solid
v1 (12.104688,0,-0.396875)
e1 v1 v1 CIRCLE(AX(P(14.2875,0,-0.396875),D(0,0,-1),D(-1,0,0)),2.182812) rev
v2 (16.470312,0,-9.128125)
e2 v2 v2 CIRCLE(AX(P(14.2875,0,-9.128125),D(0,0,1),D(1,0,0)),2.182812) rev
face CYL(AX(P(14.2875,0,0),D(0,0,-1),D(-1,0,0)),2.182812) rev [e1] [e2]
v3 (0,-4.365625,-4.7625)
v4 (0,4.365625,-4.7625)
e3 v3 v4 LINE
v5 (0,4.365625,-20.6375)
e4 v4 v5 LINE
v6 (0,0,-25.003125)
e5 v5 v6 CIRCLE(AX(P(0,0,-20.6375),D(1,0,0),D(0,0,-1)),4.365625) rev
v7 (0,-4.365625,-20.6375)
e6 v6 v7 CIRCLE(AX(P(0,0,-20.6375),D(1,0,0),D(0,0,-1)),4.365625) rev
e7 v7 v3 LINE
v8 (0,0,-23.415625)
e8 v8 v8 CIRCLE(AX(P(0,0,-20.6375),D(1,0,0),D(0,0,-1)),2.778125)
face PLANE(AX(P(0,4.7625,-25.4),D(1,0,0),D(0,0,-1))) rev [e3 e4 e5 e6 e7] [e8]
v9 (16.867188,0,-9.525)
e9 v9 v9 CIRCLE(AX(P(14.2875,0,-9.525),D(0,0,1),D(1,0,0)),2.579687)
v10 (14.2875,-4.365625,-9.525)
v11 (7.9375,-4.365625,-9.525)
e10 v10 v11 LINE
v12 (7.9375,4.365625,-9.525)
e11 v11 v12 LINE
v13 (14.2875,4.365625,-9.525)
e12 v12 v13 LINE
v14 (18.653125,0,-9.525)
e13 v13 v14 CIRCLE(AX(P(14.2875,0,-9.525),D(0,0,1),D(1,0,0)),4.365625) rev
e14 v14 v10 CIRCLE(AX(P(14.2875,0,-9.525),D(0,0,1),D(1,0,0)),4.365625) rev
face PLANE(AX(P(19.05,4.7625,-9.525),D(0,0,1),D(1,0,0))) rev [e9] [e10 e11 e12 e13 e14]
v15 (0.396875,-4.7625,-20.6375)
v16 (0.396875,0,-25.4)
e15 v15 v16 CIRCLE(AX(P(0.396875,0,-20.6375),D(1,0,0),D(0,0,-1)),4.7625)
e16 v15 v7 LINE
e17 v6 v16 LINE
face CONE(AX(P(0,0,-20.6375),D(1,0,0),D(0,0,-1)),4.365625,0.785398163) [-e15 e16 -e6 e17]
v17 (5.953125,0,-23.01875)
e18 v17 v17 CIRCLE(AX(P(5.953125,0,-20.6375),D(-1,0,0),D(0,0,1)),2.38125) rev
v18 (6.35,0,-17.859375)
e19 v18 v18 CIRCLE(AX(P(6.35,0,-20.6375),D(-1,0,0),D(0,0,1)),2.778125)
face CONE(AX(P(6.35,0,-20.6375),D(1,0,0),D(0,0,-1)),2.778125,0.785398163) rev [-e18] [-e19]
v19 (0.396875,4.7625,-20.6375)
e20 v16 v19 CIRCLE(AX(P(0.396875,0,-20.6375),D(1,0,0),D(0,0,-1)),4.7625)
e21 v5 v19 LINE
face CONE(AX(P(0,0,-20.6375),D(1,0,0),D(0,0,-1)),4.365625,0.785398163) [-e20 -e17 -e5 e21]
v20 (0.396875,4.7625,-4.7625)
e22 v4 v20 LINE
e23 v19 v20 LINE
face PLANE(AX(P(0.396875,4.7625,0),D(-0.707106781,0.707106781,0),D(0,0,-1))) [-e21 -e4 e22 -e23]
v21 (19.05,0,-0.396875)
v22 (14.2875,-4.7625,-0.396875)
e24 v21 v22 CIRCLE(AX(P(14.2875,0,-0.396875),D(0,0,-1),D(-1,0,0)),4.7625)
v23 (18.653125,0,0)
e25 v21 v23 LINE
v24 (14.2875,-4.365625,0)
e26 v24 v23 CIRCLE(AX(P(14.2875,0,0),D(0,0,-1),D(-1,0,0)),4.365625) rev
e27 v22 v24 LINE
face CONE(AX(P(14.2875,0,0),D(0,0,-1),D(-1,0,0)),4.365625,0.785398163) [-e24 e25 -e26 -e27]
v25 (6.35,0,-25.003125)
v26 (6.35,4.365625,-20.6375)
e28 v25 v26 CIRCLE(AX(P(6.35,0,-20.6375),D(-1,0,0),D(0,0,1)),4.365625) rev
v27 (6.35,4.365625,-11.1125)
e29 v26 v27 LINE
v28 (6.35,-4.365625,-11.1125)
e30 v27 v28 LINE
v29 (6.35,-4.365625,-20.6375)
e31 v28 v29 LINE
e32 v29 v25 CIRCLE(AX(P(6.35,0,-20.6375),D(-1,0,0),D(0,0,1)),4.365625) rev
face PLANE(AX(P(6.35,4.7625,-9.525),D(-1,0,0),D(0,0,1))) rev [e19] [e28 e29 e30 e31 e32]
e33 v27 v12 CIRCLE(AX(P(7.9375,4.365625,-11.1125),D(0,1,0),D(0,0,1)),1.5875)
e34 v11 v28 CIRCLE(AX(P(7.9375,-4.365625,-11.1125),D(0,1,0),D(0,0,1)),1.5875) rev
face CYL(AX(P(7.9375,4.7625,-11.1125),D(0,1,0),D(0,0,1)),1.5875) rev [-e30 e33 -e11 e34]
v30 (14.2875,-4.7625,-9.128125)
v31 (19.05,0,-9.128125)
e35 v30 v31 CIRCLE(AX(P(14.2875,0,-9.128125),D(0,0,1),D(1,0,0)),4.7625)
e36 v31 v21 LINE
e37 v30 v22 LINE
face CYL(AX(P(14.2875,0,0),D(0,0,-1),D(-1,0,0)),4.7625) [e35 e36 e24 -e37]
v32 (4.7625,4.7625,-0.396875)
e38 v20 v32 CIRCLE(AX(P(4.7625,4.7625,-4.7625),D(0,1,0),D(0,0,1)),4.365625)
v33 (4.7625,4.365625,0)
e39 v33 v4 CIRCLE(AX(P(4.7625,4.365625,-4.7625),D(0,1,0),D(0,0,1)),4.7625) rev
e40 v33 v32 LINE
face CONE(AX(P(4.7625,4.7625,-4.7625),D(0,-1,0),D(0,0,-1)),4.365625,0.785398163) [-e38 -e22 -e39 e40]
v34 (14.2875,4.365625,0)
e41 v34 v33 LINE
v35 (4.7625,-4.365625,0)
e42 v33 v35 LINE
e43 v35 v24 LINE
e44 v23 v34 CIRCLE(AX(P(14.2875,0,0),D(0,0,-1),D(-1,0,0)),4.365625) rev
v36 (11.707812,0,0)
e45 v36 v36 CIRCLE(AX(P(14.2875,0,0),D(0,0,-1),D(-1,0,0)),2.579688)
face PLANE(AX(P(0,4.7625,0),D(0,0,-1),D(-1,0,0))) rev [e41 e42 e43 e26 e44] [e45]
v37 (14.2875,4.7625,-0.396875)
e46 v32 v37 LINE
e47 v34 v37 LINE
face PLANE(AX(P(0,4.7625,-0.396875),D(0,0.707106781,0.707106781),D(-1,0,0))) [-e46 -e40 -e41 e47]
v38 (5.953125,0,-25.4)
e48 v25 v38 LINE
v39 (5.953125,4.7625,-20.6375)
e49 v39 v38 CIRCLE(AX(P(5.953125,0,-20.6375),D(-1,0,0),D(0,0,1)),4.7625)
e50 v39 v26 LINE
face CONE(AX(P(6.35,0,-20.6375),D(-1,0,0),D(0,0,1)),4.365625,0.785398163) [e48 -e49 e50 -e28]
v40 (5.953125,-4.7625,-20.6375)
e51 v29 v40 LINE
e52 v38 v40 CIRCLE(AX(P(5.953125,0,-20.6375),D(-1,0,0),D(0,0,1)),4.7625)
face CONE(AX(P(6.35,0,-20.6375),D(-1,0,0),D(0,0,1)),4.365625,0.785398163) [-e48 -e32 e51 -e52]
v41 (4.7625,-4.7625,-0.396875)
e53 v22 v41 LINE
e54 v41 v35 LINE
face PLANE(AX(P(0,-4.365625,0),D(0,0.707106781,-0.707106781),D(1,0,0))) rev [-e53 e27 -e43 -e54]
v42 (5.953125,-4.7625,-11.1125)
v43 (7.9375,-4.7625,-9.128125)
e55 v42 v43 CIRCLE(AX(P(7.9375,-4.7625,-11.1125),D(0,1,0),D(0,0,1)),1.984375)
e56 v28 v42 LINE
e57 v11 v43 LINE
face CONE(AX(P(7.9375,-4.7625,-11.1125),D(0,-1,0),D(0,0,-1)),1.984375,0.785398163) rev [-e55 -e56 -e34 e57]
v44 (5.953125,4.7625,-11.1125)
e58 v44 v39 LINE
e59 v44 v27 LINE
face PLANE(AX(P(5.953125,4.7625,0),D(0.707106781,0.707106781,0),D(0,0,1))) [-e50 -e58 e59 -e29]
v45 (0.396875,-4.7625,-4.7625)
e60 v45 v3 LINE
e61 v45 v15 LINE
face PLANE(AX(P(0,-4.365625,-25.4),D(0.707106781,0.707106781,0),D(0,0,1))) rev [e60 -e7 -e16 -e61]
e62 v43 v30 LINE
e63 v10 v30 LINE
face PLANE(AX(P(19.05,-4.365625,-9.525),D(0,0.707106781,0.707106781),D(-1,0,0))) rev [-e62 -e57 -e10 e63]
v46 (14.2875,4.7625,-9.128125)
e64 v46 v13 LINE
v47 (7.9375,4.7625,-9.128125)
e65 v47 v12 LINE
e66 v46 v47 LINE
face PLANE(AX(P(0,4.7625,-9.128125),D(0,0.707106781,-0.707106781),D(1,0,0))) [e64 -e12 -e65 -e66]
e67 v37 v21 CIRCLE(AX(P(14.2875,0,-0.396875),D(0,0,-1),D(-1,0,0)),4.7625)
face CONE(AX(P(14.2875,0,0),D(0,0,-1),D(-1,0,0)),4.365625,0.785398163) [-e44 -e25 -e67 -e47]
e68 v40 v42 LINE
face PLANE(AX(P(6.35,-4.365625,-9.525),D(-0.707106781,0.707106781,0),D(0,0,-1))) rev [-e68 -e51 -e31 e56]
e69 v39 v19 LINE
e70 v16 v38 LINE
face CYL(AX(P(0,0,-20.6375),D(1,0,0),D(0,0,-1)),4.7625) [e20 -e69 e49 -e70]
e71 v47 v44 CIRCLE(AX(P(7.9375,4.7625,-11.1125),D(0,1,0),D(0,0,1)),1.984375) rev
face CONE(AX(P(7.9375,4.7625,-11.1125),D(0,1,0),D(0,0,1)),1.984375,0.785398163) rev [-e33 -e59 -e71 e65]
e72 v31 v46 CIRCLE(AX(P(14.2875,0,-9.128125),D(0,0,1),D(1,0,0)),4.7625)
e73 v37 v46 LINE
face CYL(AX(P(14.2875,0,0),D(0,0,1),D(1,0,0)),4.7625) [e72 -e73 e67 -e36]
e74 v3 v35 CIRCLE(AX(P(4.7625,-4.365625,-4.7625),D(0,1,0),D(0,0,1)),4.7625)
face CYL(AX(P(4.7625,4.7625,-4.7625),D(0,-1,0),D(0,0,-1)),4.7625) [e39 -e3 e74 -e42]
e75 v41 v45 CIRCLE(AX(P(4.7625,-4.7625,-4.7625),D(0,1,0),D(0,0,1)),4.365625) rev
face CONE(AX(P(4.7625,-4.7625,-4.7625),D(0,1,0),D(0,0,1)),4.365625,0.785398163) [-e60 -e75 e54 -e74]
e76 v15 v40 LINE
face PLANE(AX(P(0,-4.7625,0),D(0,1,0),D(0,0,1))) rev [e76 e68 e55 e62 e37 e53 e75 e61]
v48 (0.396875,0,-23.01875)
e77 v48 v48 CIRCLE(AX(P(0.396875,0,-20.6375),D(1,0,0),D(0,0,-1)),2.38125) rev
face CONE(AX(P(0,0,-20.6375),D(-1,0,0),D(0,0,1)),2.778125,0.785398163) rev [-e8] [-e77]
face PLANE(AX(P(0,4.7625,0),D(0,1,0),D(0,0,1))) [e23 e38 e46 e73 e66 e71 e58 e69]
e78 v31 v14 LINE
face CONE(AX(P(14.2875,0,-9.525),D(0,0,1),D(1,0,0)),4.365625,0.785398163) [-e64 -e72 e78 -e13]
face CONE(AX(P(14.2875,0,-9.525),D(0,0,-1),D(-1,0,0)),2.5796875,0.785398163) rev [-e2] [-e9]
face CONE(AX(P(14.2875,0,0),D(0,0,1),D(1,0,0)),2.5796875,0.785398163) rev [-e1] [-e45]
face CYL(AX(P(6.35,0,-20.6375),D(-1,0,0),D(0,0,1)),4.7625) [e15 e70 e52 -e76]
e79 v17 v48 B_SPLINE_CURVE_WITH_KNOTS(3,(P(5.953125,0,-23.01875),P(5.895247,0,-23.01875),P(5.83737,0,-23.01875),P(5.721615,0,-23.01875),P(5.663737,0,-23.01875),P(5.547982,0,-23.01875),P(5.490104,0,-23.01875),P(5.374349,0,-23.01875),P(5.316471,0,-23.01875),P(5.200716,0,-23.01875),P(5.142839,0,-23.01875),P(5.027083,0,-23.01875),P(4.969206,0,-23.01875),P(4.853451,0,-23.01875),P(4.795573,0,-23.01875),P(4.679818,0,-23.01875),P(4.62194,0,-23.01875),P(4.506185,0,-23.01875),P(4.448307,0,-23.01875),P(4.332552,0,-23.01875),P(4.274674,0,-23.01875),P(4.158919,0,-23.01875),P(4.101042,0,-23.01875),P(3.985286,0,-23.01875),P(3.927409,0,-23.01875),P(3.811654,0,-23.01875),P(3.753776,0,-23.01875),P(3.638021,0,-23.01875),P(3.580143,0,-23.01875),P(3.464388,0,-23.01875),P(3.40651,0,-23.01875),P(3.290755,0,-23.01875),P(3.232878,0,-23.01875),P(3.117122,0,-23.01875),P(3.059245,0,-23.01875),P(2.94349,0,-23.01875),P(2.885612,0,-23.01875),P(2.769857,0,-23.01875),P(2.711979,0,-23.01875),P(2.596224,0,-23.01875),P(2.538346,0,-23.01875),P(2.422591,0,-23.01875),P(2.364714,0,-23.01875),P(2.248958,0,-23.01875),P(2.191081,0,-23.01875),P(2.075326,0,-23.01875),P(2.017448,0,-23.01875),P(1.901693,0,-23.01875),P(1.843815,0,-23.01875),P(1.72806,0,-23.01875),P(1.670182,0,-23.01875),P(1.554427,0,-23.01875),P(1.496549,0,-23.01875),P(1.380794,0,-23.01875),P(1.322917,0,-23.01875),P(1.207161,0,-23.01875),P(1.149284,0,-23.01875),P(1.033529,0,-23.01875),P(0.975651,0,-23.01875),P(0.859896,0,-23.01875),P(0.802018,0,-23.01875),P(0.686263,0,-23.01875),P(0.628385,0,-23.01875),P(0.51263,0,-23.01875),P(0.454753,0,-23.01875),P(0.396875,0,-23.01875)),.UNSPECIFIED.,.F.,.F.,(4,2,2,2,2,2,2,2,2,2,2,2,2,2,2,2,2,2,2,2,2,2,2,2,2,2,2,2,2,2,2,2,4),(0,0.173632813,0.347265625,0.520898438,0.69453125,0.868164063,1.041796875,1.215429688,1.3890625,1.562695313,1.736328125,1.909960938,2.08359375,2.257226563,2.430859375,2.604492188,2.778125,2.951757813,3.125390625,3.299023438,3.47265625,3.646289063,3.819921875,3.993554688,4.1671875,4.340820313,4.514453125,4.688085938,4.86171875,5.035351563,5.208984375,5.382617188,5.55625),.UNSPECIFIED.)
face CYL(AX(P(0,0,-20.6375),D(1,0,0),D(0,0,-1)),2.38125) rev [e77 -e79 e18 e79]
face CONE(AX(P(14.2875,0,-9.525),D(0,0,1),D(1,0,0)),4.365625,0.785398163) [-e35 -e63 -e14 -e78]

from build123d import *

# Parameters (mm, degrees)
BOSS_EXTRUDE1_DEPTH     = 4.7625
CUT_EXTRUDE1_DEPTH      = 26.250733281
CUT_EXTRUDE1_DEPTH_BACK = 26.250733281
SKETCH2_R               = 2.1828125
CUT_EXTRUDE2_DEPTH      = 29.794641971
CUT_EXTRUDE2_DEPTH_BACK = 29.794641971
SKETCH3_R               = 2.38125
FILLET1_R               = 4.7625
FILLET2_R               = 1.5875
CHAMFER1_SIZE           = 0.396875


with BuildPart() as part:
    # Sketch1 → Boss-Extrude1 (new, symmetric)
    with BuildSketch(Plane(origin=(0, 0, 0), x_dir=(1, 0, 0), z_dir=(0, 1, 0))):
        Polygon((0, 0), (19.05, 0), (19.05, 9.525), (6.35, 9.525), (6.35, 25.4), (0, 25.4), align=None)
    extrude(amount=BOSS_EXTRUDE1_DEPTH, both=True)

    # Sketch2 → Cut-Extrude1 (cut, two sides: drawn at the far end of the back side and taken through both)
    with BuildSketch(Plane(origin=(0, 0, -9.525), x_dir=(-1, 0, 0), z_dir=(0, 0, -1)).offset(-CUT_EXTRUDE1_DEPTH_BACK)):
        with Locations((-14.2875, 0)):
            Circle(SKETCH2_R)
    extrude(amount=CUT_EXTRUDE1_DEPTH + CUT_EXTRUDE1_DEPTH_BACK, mode=Mode.SUBTRACT)

    # Sketch3 → Cut-Extrude2 (cut, two sides: drawn at the far end of the back side and taken through both)
    with BuildSketch(Plane(origin=(6.35, 0, 0), x_dir=(0, 0, -1), z_dir=(1, 0, 0)).offset(-CUT_EXTRUDE2_DEPTH_BACK)):
        with Locations((20.6375, 0)):
            Circle(SKETCH3_R)
    extrude(amount=CUT_EXTRUDE2_DEPTH + CUT_EXTRUDE2_DEPTH_BACK, mode=Mode.SUBTRACT)

    # Fillet1
    fillet1_edges = [part.edges().sort_by_distance(p)[0] for p in [
        (0, 0, 0),
        (3.175, -4.7625, -25.4),
        (3.175, 4.7625, -25.4),
        (19.05, -4.7625, -4.7625),
        (19.05, 4.7625, -4.7625),
    ]]
    fillet(fillet1_edges, radius=FILLET1_R - 0.0001)  # a hair under: the kernel refuses the full size

    # Fillet2
    fillet2_edges = [part.edges().sort_by_distance(p)[0] for p in [
        (6.35, 0, -9.525),
    ]]
    fillet(fillet2_edges, radius=FILLET2_R)

    # Chamfer1
    chamfer1_edges = [part.edges().sort_by_distance(p)[0] for p in [
        (16.4703125, 0, 0),
        (16.4703125, 0, -9.525),
        (0, 0, -18.25625),
        (6.35, 0, -18.25625),
        (9.525, -4.7625, 0),
        (9.525, 4.7625, 0),
        (17.655125335, 3.367625335, 0),
        (17.655125335, -3.367625335, 0),
        (0, -4.7625, -12.7),
        (11.11255, -4.7625, -9.525),
        (1.394874665, -4.7625, -1.394874665),
        (0, 4.7625, -12.7),
        (0, 3.367625335, -24.005125335),
        (0, -3.367625335, -24.005125335),
        (11.11255, 4.7625, -9.525),
        (1.394874665, 4.7625, -1.394874665),
        (6.35, 3.367625335, -24.005125335),
        (6.35, -3.367625335, -24.005125335),
        (17.655125335, 3.367625335, -9.525),
        (17.655125335, -3.367625335, -9.525),
        (6.35, -4.7625, -15.87505),
        (6.35, 4.7625, -15.87505),
        (6.814967985, -4.7625, -9.989967985),
        (6.814967985, 4.7625, -9.989967985),
    ]]
    chamfer(chamfer1_edges, length=CHAMFER1_SIZE)


solid = part.part
